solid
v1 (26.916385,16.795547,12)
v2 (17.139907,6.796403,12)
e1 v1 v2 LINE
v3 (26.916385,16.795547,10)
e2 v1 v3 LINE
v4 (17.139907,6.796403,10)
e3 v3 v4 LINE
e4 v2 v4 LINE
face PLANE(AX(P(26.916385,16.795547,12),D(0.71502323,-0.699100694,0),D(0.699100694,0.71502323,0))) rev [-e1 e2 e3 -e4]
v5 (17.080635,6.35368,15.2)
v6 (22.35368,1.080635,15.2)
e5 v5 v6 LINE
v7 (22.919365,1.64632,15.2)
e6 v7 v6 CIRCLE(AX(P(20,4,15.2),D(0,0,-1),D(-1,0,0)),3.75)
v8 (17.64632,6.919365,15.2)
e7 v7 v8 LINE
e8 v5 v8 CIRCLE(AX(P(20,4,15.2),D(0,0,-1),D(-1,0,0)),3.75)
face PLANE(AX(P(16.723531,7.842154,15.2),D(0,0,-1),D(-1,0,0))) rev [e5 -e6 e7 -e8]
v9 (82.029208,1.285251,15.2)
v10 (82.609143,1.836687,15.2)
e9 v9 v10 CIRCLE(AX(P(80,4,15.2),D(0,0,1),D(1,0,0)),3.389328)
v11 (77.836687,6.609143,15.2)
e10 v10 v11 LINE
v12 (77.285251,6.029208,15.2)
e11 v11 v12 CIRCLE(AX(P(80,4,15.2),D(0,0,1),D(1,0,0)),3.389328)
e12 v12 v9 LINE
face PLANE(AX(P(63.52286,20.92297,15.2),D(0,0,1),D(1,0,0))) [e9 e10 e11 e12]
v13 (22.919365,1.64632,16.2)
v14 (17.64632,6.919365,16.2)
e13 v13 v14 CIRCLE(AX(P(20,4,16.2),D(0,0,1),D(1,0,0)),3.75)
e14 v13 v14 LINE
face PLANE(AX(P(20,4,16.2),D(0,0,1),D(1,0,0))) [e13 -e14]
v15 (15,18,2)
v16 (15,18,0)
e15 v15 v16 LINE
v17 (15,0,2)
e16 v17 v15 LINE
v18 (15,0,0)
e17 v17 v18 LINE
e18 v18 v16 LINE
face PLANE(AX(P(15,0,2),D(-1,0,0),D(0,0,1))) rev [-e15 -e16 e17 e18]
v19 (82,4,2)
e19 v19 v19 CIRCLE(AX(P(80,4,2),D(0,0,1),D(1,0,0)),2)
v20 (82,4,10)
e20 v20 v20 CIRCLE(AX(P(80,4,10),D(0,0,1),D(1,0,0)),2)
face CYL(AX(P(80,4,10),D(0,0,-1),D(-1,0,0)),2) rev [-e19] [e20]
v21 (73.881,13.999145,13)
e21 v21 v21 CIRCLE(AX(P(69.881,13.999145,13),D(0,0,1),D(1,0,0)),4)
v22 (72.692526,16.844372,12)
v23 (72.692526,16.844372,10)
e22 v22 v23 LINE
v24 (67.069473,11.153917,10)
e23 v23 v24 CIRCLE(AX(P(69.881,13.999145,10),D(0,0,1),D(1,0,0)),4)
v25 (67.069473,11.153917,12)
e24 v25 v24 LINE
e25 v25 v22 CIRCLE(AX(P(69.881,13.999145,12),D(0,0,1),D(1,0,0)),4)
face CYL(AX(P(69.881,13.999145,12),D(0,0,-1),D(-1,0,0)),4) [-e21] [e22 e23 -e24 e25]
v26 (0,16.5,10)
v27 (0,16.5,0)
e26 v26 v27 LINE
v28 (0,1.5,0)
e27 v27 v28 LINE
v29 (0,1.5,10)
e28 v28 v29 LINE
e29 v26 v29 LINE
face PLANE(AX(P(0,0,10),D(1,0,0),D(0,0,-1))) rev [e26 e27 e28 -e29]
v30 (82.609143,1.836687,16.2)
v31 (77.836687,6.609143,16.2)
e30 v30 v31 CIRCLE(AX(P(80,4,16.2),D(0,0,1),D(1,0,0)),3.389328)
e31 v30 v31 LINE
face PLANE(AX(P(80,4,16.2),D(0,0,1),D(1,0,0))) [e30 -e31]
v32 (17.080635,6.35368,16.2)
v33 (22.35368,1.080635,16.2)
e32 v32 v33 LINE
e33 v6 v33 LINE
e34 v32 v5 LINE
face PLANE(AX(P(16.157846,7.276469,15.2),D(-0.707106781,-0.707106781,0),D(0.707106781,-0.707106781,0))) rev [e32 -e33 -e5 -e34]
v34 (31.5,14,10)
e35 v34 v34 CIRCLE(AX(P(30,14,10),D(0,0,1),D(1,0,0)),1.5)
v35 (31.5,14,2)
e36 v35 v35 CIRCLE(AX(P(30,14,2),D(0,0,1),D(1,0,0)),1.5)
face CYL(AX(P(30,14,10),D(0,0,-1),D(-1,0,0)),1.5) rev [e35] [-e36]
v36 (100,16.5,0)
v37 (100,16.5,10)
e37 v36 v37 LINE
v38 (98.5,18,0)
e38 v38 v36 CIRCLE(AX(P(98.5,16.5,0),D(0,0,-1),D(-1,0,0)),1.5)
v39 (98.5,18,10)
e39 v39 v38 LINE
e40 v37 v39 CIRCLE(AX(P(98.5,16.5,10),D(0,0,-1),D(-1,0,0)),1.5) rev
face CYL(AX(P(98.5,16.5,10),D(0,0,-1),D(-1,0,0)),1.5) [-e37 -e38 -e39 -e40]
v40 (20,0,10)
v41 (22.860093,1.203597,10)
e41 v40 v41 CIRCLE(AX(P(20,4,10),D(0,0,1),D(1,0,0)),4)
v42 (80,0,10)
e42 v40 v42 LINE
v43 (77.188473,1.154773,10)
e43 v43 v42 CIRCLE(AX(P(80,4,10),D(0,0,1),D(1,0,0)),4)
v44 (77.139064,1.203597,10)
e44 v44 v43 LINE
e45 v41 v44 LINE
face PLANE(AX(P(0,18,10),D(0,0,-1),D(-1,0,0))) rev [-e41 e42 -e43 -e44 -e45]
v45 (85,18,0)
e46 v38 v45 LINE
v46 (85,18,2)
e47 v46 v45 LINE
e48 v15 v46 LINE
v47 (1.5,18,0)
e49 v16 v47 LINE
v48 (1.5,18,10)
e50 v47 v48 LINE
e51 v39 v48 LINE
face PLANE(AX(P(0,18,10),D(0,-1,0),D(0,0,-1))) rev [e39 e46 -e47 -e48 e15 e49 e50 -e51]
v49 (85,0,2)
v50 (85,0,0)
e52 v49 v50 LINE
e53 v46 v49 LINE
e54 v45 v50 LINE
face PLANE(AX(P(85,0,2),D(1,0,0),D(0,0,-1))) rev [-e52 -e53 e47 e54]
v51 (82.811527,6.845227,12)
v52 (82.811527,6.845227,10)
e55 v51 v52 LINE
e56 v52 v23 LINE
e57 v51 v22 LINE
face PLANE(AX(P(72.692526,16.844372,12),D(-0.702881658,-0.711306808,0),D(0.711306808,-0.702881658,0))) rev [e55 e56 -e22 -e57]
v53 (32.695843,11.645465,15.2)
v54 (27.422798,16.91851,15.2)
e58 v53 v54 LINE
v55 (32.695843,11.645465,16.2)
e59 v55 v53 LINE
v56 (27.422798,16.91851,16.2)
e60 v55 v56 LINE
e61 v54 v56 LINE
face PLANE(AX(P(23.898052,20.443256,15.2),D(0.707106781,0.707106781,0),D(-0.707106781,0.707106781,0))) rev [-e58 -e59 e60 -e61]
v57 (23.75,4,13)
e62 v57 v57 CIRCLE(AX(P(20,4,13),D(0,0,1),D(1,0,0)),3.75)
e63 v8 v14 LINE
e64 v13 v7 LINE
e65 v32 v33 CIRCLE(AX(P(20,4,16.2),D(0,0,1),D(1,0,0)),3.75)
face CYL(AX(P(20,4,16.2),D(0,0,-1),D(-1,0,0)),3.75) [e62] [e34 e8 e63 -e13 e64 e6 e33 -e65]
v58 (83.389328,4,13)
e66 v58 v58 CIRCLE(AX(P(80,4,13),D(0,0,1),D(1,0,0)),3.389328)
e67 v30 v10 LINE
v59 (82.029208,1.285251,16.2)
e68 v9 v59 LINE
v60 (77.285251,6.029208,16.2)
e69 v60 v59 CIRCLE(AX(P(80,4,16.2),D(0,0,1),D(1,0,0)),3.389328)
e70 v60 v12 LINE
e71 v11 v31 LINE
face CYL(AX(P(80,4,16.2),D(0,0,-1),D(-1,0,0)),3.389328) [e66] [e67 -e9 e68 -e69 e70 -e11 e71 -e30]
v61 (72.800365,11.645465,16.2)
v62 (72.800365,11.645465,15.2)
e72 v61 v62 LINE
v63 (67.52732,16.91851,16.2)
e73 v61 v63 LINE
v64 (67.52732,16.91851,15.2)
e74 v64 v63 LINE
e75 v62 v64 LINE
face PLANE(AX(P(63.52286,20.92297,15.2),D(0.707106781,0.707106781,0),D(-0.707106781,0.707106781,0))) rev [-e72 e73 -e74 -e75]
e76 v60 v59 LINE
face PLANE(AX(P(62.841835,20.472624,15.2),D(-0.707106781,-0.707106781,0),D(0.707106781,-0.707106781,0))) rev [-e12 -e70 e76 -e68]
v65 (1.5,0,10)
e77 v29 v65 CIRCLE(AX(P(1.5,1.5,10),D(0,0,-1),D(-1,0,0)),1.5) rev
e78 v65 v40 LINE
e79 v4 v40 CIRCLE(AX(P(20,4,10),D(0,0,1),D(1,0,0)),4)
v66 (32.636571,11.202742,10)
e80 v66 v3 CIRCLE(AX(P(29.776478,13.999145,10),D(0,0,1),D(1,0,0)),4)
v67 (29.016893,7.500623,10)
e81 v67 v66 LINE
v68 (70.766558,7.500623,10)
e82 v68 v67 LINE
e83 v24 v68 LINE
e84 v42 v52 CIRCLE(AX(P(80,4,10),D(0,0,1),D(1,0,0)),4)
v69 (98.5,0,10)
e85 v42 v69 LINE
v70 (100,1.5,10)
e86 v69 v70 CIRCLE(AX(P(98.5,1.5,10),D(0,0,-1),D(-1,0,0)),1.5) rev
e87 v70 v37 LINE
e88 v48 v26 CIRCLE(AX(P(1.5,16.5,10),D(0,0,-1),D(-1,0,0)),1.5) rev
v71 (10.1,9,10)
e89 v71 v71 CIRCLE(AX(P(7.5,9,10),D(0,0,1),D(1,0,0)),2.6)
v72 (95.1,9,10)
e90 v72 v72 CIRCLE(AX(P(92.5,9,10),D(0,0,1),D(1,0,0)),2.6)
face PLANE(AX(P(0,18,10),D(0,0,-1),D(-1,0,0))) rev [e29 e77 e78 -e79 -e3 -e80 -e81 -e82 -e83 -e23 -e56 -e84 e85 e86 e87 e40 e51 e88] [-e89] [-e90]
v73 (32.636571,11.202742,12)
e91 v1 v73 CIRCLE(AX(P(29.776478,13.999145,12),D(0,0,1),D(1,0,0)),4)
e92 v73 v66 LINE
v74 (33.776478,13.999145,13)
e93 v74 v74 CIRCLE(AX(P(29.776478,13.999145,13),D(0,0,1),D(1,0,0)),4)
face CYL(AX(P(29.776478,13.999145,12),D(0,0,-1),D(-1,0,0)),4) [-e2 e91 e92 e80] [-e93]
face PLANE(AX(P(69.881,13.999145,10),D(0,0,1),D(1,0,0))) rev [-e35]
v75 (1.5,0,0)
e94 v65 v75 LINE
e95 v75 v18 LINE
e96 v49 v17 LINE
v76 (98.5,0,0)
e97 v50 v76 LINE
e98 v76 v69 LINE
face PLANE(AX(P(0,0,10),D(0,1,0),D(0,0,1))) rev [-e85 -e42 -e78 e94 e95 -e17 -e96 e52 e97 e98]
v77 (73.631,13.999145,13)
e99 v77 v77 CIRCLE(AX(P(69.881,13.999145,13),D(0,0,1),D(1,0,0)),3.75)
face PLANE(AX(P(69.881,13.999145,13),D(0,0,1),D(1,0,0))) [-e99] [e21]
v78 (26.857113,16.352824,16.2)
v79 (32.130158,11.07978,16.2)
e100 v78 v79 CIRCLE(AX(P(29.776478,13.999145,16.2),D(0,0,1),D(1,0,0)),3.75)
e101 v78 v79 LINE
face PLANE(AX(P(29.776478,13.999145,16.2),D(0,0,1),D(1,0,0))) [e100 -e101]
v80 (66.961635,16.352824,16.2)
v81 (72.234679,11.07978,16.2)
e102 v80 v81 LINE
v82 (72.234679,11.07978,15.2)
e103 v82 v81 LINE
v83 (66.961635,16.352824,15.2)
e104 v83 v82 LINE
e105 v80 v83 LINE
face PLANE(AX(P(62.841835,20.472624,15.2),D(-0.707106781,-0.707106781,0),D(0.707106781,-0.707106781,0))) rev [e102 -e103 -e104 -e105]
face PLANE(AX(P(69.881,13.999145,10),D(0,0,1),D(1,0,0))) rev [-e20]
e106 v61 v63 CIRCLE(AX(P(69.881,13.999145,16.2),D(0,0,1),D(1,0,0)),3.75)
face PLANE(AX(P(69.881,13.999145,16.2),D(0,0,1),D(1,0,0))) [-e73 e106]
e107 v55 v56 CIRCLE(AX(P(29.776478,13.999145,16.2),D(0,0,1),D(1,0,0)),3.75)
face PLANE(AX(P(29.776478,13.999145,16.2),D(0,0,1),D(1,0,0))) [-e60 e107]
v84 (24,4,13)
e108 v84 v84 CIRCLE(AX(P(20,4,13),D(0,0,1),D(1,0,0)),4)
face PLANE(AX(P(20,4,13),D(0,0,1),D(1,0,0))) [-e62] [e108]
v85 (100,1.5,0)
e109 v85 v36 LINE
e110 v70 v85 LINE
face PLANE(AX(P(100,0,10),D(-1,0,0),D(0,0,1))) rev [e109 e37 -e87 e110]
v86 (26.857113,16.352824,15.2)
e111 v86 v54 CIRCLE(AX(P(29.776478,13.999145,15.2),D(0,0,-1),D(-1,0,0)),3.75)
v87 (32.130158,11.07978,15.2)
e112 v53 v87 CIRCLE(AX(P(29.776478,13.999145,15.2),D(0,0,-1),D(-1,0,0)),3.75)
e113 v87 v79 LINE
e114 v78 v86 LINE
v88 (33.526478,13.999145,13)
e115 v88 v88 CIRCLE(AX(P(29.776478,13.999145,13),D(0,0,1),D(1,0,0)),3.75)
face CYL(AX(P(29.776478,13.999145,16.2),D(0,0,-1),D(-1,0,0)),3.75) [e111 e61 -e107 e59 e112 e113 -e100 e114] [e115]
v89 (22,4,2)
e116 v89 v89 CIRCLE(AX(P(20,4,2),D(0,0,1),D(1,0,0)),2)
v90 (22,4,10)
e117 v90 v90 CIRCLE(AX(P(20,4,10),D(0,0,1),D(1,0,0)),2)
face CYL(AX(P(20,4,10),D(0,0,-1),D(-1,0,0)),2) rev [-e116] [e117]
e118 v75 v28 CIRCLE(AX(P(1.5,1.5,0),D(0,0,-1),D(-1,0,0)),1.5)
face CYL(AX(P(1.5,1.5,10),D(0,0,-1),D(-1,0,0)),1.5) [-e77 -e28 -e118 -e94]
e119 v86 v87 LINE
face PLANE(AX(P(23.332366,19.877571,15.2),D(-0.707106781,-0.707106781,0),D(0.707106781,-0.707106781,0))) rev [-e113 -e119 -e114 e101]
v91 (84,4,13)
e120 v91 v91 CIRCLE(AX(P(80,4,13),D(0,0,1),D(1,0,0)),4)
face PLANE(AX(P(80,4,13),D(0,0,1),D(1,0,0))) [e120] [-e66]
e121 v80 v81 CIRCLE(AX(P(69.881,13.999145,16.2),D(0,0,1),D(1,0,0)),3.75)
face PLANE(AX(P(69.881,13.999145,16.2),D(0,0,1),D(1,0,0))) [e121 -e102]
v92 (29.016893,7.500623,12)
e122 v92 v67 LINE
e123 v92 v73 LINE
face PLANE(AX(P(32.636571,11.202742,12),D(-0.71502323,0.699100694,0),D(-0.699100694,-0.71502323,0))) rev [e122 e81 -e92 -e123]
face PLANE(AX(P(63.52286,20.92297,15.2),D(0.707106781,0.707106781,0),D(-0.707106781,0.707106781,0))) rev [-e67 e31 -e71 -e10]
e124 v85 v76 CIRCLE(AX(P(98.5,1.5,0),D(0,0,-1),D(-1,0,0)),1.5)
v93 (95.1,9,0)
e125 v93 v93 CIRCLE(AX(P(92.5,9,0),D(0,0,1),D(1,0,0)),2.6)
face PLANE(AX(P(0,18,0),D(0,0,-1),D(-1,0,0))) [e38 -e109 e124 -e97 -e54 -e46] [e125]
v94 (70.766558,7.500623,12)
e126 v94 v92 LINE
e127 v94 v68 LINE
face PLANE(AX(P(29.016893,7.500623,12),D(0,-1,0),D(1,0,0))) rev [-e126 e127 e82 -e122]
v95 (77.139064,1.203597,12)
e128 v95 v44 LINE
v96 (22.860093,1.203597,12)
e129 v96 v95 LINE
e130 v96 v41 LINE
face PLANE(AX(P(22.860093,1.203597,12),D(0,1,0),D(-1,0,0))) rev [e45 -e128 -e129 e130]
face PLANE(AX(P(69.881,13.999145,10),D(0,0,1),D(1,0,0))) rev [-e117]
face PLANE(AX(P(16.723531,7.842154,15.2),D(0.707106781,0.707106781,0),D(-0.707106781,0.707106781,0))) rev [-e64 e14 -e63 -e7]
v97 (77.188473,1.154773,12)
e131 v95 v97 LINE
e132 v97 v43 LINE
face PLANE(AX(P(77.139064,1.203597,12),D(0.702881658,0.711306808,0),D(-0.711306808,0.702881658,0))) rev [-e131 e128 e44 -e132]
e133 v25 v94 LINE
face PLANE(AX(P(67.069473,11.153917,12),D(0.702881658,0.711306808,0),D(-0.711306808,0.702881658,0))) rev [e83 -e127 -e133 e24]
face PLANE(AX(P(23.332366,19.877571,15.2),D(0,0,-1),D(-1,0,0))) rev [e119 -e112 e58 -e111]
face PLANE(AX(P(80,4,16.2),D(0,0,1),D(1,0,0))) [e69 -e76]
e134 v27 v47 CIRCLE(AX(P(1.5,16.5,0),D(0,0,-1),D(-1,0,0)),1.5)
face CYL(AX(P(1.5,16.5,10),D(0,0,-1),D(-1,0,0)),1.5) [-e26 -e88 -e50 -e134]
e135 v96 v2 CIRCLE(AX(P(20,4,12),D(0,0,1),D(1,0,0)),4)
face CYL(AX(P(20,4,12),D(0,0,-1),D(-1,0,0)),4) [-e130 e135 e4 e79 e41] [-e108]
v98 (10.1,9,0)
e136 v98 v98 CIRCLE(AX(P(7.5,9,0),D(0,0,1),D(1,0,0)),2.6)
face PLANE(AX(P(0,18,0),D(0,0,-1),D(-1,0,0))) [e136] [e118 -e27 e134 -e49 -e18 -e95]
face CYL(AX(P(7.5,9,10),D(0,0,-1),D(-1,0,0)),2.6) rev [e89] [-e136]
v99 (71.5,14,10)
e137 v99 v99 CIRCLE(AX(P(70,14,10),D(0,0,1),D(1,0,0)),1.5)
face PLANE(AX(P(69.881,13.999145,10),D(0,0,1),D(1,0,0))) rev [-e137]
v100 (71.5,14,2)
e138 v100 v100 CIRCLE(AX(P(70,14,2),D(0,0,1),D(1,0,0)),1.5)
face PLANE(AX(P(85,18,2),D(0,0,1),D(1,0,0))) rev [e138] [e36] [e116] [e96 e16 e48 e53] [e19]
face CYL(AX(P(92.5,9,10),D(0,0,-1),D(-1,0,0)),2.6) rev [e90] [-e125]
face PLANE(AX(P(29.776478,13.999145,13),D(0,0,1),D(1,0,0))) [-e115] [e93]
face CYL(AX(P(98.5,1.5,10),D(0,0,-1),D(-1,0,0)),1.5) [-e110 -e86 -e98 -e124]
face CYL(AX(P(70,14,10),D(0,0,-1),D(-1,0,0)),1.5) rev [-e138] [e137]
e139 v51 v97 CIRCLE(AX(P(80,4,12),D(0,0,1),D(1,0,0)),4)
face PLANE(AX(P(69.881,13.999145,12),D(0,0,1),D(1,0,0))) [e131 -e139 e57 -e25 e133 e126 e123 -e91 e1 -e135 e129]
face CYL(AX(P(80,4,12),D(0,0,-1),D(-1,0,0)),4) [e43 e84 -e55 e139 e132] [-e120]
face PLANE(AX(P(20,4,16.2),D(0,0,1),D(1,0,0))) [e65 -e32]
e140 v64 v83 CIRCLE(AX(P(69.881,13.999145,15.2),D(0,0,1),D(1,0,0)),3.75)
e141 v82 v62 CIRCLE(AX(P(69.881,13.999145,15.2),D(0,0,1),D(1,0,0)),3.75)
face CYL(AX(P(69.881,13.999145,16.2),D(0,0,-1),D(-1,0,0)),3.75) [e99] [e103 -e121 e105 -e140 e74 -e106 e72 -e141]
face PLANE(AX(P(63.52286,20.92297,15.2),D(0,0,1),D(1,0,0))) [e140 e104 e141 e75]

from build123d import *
from build123d.topology import SkipClean

# Parameters (mm, degrees)
SKETCH_1_W          = 100
SKETCH_1_H          = 18
SKETCH_1_R          = 2.6
SKETCH_1_R_2        = 2
SKETCH_1_R_3        = 1.5
EXTRUDE_1_DEPTH     = 10
SKETCH_2_W          = 70
SKETCH_2_H          = 18
CUT_EXTRUDE_1_DEPTH = 2
FILLET_1_R          = 1.5
EXTRUDE_3_DEPTH     = 2
SKETCH_4_R          = 4
EXTRUDE_4_DEPTH     = 1
SKETCH_5_R          = 3.38932831
EXTRUDE_5_DEPTH     = 3.2
SKETCH_6_R          = 3.75
EXTRUDE_6_DEPTH     = 3.2
SKETCH_7_R          = 3.75
EXTRUDE_7_DEPTH     = 3.2
SKETCH_8_R          = 3.75
EXTRUDE_8_DEPTH     = 3.2
CUT_EXTRUDE_2_DEPTH = 1
CUT_EXTRUDE_3_DEPTH = 1
CUT_EXTRUDE_4_DEPTH = 1


with BuildPart() as part:
    # Эскиз1 → Вытянуть1 (new body)
    with BuildSketch(Plane.XY):
        with Locations((50, 9)):
            Rectangle(SKETCH_1_W, SKETCH_1_H)
        with Locations((7.5, 9)):
            Circle(SKETCH_1_R, mode=Mode.SUBTRACT)
        with Locations((92.5, 9)):
            Circle(SKETCH_1_R, mode=Mode.SUBTRACT)
        with Locations((20, 4)):
            Circle(SKETCH_1_R_2, mode=Mode.SUBTRACT)
        with Locations((80, 4)):
            Circle(SKETCH_1_R_2, mode=Mode.SUBTRACT)
        with Locations((30, 14)):
            Circle(SKETCH_1_R_3, mode=Mode.SUBTRACT)
        with Locations((70, 14)):
            Circle(SKETCH_1_R_3, mode=Mode.SUBTRACT)
    extrude(amount=EXTRUDE_1_DEPTH)

    # Эскиз2 → Вырез-Вытянуть1 (cut)
    with BuildSketch(Plane(origin=(0, 0, 0), x_dir=(-1, 0, 0), z_dir=(0, 0, -1))):
        with Locations((-50, 9)):
            Rectangle(SKETCH_2_W, SKETCH_2_H)
    extrude(amount=-CUT_EXTRUDE_1_DEPTH, mode=Mode.SUBTRACT)

    # Скругление1
    fillet_1_edges = [part.edges().sort_by_distance(p)[0] for p in [
        (100, 0, 5),
        (0, 0, 5),
        (100, 18, 5),
        (0, 18, 5),
    ]]
    fillet(fillet_1_edges, radius=FILLET_1_R)

    # Эскиз3 → Вытянуть3 (add)
    with BuildSketch(Plane.XY.offset(10)):
        with BuildLine():
            Line((72.692526424, 16.844371856), (82.811526632, 6.845227231))
            ThreePointArc((82.811526632, 6.845227231), (82.845227231, 1.188473368), (77.188473368, 1.154772769))
            Line((77.188473368, 1.154772769), (77.139063674, 1.203597224))
            Line((77.139063674, 1.203597224), (22.860092921, 1.203597224))
            ThreePointArc((22.860092921, 1.203597224), (17.203597224, 1.139907079), (17.139907079, 6.796402776))
            Line((17.139907079, 6.796402776), (26.916385172, 16.795547401))
            ThreePointArc((26.916385172, 16.795547401), (32.572880868, 16.859237546), (32.636571013, 11.20274185))
            Line((32.636571013, 11.20274185), (29.016893244, 7.500623237))
            Line((29.016893244, 7.500623237), (70.766557833, 7.500623237))
            Line((70.766557833, 7.500623237), (67.06947316, 11.153917394))
            ThreePointArc((67.06947316, 11.153917394), (67.035772561, 16.810671257), (72.692526424, 16.844371856))
        make_face()
    extrude(amount=EXTRUDE_3_DEPTH)

    # Эскиз4 → Вытянуть4 (add)
    with SkipClean():  # the faces are left unmerged after this step: merging them gives an invalid solid
        with BuildSketch(Plane.XY.offset(12)):
            with Locations(Location((20, 4, 0), (0, 0, 135.645102996))):
                Circle(SKETCH_4_R)
            with Locations(Location((29.776478092, 13.999144625, 0), (0, 0, 135.645102996))):
                Circle(SKETCH_4_R)
            with Locations(Location((69.880999792, 13.999144625, 0), (0, 0, 225.341340509))):
                Circle(SKETCH_4_R)
            with Locations(Location((80, 4, 0), (0, 0, 225.341340509))):
                Circle(SKETCH_4_R)
        extrude(amount=EXTRUDE_4_DEPTH)
    add(part.part.scale(1), mode=Mode.REPLACE)  # the faces are merged on a copy

    # Эскиз5 → Вытянуть5 (add)
    with BuildSketch(Plane.XY.offset(13)):
        with Locations(Location((80, 4, 0), (0, 0, 143.222791585))):
            Circle(SKETCH_5_R)
    extrude(amount=EXTRUDE_5_DEPTH)

    # Эскиз6 → Вытянуть6 (add)
    with BuildSketch(Plane.XY.offset(13)):
        with Locations(Location((69.880999792, 13.999144625, 0), (0, 0, 141.123198866))):
            Circle(SKETCH_6_R)
    extrude(amount=EXTRUDE_6_DEPTH)

    # Эскиз7 → Вытянуть7 (add)
    with BuildSketch(Plane.XY.offset(13)):
        with Locations(Location((29.776478092, 13.999144625, 0), (0, 0, 141.123198866))):
            Circle(SKETCH_7_R)
    extrude(amount=EXTRUDE_7_DEPTH)

    # Эскиз8 → Вытянуть8 (add)
    with BuildSketch(Plane.XY.offset(13)):
        with Locations(Location((20, 4, 0), (0, 0, 141.123198866))):
            Circle(SKETCH_8_R)
    extrude(amount=EXTRUDE_8_DEPTH)

    # Эскиз9 → Вырез-Вытянуть2 (cut)
    with BuildSketch(Plane.XY.offset(16.2)):
        Polygon((16.157845588, 7.276468987), (24.091280084, -0.656965509), (24.596689062, -0.031003637), (16.723531013, 7.842154412), align=None)
    extrude(amount=-CUT_EXTRUDE_2_DEPTH, mode=Mode.SUBTRACT)

    # Эскиз10 → Вырез-Вытянуть3 (cut)
    with BuildSketch(Plane.XY.offset(16.2)):
        Polygon((23.332366462, 19.877570831), (34.653872269, 8.556065024), (35.333565103, 9.007743039), (23.898051887, 20.443256256), align=None)
    extrude(amount=-CUT_EXTRUDE_3_DEPTH, mode=Mode.SUBTRACT)

    # Эскиз11 → Вырез-Вытянуть4 (cut)
    with BuildSketch(Plane.XY.offset(16.2)):
        Polygon((62.841835451, 20.472623541), (84.739405762, -1.42494677), (85.695784292, -1.249954449), (63.522860335, 20.922969507), align=None)
    extrude(amount=-CUT_EXTRUDE_4_DEPTH, mode=Mode.SUBTRACT)


solid = part.part
